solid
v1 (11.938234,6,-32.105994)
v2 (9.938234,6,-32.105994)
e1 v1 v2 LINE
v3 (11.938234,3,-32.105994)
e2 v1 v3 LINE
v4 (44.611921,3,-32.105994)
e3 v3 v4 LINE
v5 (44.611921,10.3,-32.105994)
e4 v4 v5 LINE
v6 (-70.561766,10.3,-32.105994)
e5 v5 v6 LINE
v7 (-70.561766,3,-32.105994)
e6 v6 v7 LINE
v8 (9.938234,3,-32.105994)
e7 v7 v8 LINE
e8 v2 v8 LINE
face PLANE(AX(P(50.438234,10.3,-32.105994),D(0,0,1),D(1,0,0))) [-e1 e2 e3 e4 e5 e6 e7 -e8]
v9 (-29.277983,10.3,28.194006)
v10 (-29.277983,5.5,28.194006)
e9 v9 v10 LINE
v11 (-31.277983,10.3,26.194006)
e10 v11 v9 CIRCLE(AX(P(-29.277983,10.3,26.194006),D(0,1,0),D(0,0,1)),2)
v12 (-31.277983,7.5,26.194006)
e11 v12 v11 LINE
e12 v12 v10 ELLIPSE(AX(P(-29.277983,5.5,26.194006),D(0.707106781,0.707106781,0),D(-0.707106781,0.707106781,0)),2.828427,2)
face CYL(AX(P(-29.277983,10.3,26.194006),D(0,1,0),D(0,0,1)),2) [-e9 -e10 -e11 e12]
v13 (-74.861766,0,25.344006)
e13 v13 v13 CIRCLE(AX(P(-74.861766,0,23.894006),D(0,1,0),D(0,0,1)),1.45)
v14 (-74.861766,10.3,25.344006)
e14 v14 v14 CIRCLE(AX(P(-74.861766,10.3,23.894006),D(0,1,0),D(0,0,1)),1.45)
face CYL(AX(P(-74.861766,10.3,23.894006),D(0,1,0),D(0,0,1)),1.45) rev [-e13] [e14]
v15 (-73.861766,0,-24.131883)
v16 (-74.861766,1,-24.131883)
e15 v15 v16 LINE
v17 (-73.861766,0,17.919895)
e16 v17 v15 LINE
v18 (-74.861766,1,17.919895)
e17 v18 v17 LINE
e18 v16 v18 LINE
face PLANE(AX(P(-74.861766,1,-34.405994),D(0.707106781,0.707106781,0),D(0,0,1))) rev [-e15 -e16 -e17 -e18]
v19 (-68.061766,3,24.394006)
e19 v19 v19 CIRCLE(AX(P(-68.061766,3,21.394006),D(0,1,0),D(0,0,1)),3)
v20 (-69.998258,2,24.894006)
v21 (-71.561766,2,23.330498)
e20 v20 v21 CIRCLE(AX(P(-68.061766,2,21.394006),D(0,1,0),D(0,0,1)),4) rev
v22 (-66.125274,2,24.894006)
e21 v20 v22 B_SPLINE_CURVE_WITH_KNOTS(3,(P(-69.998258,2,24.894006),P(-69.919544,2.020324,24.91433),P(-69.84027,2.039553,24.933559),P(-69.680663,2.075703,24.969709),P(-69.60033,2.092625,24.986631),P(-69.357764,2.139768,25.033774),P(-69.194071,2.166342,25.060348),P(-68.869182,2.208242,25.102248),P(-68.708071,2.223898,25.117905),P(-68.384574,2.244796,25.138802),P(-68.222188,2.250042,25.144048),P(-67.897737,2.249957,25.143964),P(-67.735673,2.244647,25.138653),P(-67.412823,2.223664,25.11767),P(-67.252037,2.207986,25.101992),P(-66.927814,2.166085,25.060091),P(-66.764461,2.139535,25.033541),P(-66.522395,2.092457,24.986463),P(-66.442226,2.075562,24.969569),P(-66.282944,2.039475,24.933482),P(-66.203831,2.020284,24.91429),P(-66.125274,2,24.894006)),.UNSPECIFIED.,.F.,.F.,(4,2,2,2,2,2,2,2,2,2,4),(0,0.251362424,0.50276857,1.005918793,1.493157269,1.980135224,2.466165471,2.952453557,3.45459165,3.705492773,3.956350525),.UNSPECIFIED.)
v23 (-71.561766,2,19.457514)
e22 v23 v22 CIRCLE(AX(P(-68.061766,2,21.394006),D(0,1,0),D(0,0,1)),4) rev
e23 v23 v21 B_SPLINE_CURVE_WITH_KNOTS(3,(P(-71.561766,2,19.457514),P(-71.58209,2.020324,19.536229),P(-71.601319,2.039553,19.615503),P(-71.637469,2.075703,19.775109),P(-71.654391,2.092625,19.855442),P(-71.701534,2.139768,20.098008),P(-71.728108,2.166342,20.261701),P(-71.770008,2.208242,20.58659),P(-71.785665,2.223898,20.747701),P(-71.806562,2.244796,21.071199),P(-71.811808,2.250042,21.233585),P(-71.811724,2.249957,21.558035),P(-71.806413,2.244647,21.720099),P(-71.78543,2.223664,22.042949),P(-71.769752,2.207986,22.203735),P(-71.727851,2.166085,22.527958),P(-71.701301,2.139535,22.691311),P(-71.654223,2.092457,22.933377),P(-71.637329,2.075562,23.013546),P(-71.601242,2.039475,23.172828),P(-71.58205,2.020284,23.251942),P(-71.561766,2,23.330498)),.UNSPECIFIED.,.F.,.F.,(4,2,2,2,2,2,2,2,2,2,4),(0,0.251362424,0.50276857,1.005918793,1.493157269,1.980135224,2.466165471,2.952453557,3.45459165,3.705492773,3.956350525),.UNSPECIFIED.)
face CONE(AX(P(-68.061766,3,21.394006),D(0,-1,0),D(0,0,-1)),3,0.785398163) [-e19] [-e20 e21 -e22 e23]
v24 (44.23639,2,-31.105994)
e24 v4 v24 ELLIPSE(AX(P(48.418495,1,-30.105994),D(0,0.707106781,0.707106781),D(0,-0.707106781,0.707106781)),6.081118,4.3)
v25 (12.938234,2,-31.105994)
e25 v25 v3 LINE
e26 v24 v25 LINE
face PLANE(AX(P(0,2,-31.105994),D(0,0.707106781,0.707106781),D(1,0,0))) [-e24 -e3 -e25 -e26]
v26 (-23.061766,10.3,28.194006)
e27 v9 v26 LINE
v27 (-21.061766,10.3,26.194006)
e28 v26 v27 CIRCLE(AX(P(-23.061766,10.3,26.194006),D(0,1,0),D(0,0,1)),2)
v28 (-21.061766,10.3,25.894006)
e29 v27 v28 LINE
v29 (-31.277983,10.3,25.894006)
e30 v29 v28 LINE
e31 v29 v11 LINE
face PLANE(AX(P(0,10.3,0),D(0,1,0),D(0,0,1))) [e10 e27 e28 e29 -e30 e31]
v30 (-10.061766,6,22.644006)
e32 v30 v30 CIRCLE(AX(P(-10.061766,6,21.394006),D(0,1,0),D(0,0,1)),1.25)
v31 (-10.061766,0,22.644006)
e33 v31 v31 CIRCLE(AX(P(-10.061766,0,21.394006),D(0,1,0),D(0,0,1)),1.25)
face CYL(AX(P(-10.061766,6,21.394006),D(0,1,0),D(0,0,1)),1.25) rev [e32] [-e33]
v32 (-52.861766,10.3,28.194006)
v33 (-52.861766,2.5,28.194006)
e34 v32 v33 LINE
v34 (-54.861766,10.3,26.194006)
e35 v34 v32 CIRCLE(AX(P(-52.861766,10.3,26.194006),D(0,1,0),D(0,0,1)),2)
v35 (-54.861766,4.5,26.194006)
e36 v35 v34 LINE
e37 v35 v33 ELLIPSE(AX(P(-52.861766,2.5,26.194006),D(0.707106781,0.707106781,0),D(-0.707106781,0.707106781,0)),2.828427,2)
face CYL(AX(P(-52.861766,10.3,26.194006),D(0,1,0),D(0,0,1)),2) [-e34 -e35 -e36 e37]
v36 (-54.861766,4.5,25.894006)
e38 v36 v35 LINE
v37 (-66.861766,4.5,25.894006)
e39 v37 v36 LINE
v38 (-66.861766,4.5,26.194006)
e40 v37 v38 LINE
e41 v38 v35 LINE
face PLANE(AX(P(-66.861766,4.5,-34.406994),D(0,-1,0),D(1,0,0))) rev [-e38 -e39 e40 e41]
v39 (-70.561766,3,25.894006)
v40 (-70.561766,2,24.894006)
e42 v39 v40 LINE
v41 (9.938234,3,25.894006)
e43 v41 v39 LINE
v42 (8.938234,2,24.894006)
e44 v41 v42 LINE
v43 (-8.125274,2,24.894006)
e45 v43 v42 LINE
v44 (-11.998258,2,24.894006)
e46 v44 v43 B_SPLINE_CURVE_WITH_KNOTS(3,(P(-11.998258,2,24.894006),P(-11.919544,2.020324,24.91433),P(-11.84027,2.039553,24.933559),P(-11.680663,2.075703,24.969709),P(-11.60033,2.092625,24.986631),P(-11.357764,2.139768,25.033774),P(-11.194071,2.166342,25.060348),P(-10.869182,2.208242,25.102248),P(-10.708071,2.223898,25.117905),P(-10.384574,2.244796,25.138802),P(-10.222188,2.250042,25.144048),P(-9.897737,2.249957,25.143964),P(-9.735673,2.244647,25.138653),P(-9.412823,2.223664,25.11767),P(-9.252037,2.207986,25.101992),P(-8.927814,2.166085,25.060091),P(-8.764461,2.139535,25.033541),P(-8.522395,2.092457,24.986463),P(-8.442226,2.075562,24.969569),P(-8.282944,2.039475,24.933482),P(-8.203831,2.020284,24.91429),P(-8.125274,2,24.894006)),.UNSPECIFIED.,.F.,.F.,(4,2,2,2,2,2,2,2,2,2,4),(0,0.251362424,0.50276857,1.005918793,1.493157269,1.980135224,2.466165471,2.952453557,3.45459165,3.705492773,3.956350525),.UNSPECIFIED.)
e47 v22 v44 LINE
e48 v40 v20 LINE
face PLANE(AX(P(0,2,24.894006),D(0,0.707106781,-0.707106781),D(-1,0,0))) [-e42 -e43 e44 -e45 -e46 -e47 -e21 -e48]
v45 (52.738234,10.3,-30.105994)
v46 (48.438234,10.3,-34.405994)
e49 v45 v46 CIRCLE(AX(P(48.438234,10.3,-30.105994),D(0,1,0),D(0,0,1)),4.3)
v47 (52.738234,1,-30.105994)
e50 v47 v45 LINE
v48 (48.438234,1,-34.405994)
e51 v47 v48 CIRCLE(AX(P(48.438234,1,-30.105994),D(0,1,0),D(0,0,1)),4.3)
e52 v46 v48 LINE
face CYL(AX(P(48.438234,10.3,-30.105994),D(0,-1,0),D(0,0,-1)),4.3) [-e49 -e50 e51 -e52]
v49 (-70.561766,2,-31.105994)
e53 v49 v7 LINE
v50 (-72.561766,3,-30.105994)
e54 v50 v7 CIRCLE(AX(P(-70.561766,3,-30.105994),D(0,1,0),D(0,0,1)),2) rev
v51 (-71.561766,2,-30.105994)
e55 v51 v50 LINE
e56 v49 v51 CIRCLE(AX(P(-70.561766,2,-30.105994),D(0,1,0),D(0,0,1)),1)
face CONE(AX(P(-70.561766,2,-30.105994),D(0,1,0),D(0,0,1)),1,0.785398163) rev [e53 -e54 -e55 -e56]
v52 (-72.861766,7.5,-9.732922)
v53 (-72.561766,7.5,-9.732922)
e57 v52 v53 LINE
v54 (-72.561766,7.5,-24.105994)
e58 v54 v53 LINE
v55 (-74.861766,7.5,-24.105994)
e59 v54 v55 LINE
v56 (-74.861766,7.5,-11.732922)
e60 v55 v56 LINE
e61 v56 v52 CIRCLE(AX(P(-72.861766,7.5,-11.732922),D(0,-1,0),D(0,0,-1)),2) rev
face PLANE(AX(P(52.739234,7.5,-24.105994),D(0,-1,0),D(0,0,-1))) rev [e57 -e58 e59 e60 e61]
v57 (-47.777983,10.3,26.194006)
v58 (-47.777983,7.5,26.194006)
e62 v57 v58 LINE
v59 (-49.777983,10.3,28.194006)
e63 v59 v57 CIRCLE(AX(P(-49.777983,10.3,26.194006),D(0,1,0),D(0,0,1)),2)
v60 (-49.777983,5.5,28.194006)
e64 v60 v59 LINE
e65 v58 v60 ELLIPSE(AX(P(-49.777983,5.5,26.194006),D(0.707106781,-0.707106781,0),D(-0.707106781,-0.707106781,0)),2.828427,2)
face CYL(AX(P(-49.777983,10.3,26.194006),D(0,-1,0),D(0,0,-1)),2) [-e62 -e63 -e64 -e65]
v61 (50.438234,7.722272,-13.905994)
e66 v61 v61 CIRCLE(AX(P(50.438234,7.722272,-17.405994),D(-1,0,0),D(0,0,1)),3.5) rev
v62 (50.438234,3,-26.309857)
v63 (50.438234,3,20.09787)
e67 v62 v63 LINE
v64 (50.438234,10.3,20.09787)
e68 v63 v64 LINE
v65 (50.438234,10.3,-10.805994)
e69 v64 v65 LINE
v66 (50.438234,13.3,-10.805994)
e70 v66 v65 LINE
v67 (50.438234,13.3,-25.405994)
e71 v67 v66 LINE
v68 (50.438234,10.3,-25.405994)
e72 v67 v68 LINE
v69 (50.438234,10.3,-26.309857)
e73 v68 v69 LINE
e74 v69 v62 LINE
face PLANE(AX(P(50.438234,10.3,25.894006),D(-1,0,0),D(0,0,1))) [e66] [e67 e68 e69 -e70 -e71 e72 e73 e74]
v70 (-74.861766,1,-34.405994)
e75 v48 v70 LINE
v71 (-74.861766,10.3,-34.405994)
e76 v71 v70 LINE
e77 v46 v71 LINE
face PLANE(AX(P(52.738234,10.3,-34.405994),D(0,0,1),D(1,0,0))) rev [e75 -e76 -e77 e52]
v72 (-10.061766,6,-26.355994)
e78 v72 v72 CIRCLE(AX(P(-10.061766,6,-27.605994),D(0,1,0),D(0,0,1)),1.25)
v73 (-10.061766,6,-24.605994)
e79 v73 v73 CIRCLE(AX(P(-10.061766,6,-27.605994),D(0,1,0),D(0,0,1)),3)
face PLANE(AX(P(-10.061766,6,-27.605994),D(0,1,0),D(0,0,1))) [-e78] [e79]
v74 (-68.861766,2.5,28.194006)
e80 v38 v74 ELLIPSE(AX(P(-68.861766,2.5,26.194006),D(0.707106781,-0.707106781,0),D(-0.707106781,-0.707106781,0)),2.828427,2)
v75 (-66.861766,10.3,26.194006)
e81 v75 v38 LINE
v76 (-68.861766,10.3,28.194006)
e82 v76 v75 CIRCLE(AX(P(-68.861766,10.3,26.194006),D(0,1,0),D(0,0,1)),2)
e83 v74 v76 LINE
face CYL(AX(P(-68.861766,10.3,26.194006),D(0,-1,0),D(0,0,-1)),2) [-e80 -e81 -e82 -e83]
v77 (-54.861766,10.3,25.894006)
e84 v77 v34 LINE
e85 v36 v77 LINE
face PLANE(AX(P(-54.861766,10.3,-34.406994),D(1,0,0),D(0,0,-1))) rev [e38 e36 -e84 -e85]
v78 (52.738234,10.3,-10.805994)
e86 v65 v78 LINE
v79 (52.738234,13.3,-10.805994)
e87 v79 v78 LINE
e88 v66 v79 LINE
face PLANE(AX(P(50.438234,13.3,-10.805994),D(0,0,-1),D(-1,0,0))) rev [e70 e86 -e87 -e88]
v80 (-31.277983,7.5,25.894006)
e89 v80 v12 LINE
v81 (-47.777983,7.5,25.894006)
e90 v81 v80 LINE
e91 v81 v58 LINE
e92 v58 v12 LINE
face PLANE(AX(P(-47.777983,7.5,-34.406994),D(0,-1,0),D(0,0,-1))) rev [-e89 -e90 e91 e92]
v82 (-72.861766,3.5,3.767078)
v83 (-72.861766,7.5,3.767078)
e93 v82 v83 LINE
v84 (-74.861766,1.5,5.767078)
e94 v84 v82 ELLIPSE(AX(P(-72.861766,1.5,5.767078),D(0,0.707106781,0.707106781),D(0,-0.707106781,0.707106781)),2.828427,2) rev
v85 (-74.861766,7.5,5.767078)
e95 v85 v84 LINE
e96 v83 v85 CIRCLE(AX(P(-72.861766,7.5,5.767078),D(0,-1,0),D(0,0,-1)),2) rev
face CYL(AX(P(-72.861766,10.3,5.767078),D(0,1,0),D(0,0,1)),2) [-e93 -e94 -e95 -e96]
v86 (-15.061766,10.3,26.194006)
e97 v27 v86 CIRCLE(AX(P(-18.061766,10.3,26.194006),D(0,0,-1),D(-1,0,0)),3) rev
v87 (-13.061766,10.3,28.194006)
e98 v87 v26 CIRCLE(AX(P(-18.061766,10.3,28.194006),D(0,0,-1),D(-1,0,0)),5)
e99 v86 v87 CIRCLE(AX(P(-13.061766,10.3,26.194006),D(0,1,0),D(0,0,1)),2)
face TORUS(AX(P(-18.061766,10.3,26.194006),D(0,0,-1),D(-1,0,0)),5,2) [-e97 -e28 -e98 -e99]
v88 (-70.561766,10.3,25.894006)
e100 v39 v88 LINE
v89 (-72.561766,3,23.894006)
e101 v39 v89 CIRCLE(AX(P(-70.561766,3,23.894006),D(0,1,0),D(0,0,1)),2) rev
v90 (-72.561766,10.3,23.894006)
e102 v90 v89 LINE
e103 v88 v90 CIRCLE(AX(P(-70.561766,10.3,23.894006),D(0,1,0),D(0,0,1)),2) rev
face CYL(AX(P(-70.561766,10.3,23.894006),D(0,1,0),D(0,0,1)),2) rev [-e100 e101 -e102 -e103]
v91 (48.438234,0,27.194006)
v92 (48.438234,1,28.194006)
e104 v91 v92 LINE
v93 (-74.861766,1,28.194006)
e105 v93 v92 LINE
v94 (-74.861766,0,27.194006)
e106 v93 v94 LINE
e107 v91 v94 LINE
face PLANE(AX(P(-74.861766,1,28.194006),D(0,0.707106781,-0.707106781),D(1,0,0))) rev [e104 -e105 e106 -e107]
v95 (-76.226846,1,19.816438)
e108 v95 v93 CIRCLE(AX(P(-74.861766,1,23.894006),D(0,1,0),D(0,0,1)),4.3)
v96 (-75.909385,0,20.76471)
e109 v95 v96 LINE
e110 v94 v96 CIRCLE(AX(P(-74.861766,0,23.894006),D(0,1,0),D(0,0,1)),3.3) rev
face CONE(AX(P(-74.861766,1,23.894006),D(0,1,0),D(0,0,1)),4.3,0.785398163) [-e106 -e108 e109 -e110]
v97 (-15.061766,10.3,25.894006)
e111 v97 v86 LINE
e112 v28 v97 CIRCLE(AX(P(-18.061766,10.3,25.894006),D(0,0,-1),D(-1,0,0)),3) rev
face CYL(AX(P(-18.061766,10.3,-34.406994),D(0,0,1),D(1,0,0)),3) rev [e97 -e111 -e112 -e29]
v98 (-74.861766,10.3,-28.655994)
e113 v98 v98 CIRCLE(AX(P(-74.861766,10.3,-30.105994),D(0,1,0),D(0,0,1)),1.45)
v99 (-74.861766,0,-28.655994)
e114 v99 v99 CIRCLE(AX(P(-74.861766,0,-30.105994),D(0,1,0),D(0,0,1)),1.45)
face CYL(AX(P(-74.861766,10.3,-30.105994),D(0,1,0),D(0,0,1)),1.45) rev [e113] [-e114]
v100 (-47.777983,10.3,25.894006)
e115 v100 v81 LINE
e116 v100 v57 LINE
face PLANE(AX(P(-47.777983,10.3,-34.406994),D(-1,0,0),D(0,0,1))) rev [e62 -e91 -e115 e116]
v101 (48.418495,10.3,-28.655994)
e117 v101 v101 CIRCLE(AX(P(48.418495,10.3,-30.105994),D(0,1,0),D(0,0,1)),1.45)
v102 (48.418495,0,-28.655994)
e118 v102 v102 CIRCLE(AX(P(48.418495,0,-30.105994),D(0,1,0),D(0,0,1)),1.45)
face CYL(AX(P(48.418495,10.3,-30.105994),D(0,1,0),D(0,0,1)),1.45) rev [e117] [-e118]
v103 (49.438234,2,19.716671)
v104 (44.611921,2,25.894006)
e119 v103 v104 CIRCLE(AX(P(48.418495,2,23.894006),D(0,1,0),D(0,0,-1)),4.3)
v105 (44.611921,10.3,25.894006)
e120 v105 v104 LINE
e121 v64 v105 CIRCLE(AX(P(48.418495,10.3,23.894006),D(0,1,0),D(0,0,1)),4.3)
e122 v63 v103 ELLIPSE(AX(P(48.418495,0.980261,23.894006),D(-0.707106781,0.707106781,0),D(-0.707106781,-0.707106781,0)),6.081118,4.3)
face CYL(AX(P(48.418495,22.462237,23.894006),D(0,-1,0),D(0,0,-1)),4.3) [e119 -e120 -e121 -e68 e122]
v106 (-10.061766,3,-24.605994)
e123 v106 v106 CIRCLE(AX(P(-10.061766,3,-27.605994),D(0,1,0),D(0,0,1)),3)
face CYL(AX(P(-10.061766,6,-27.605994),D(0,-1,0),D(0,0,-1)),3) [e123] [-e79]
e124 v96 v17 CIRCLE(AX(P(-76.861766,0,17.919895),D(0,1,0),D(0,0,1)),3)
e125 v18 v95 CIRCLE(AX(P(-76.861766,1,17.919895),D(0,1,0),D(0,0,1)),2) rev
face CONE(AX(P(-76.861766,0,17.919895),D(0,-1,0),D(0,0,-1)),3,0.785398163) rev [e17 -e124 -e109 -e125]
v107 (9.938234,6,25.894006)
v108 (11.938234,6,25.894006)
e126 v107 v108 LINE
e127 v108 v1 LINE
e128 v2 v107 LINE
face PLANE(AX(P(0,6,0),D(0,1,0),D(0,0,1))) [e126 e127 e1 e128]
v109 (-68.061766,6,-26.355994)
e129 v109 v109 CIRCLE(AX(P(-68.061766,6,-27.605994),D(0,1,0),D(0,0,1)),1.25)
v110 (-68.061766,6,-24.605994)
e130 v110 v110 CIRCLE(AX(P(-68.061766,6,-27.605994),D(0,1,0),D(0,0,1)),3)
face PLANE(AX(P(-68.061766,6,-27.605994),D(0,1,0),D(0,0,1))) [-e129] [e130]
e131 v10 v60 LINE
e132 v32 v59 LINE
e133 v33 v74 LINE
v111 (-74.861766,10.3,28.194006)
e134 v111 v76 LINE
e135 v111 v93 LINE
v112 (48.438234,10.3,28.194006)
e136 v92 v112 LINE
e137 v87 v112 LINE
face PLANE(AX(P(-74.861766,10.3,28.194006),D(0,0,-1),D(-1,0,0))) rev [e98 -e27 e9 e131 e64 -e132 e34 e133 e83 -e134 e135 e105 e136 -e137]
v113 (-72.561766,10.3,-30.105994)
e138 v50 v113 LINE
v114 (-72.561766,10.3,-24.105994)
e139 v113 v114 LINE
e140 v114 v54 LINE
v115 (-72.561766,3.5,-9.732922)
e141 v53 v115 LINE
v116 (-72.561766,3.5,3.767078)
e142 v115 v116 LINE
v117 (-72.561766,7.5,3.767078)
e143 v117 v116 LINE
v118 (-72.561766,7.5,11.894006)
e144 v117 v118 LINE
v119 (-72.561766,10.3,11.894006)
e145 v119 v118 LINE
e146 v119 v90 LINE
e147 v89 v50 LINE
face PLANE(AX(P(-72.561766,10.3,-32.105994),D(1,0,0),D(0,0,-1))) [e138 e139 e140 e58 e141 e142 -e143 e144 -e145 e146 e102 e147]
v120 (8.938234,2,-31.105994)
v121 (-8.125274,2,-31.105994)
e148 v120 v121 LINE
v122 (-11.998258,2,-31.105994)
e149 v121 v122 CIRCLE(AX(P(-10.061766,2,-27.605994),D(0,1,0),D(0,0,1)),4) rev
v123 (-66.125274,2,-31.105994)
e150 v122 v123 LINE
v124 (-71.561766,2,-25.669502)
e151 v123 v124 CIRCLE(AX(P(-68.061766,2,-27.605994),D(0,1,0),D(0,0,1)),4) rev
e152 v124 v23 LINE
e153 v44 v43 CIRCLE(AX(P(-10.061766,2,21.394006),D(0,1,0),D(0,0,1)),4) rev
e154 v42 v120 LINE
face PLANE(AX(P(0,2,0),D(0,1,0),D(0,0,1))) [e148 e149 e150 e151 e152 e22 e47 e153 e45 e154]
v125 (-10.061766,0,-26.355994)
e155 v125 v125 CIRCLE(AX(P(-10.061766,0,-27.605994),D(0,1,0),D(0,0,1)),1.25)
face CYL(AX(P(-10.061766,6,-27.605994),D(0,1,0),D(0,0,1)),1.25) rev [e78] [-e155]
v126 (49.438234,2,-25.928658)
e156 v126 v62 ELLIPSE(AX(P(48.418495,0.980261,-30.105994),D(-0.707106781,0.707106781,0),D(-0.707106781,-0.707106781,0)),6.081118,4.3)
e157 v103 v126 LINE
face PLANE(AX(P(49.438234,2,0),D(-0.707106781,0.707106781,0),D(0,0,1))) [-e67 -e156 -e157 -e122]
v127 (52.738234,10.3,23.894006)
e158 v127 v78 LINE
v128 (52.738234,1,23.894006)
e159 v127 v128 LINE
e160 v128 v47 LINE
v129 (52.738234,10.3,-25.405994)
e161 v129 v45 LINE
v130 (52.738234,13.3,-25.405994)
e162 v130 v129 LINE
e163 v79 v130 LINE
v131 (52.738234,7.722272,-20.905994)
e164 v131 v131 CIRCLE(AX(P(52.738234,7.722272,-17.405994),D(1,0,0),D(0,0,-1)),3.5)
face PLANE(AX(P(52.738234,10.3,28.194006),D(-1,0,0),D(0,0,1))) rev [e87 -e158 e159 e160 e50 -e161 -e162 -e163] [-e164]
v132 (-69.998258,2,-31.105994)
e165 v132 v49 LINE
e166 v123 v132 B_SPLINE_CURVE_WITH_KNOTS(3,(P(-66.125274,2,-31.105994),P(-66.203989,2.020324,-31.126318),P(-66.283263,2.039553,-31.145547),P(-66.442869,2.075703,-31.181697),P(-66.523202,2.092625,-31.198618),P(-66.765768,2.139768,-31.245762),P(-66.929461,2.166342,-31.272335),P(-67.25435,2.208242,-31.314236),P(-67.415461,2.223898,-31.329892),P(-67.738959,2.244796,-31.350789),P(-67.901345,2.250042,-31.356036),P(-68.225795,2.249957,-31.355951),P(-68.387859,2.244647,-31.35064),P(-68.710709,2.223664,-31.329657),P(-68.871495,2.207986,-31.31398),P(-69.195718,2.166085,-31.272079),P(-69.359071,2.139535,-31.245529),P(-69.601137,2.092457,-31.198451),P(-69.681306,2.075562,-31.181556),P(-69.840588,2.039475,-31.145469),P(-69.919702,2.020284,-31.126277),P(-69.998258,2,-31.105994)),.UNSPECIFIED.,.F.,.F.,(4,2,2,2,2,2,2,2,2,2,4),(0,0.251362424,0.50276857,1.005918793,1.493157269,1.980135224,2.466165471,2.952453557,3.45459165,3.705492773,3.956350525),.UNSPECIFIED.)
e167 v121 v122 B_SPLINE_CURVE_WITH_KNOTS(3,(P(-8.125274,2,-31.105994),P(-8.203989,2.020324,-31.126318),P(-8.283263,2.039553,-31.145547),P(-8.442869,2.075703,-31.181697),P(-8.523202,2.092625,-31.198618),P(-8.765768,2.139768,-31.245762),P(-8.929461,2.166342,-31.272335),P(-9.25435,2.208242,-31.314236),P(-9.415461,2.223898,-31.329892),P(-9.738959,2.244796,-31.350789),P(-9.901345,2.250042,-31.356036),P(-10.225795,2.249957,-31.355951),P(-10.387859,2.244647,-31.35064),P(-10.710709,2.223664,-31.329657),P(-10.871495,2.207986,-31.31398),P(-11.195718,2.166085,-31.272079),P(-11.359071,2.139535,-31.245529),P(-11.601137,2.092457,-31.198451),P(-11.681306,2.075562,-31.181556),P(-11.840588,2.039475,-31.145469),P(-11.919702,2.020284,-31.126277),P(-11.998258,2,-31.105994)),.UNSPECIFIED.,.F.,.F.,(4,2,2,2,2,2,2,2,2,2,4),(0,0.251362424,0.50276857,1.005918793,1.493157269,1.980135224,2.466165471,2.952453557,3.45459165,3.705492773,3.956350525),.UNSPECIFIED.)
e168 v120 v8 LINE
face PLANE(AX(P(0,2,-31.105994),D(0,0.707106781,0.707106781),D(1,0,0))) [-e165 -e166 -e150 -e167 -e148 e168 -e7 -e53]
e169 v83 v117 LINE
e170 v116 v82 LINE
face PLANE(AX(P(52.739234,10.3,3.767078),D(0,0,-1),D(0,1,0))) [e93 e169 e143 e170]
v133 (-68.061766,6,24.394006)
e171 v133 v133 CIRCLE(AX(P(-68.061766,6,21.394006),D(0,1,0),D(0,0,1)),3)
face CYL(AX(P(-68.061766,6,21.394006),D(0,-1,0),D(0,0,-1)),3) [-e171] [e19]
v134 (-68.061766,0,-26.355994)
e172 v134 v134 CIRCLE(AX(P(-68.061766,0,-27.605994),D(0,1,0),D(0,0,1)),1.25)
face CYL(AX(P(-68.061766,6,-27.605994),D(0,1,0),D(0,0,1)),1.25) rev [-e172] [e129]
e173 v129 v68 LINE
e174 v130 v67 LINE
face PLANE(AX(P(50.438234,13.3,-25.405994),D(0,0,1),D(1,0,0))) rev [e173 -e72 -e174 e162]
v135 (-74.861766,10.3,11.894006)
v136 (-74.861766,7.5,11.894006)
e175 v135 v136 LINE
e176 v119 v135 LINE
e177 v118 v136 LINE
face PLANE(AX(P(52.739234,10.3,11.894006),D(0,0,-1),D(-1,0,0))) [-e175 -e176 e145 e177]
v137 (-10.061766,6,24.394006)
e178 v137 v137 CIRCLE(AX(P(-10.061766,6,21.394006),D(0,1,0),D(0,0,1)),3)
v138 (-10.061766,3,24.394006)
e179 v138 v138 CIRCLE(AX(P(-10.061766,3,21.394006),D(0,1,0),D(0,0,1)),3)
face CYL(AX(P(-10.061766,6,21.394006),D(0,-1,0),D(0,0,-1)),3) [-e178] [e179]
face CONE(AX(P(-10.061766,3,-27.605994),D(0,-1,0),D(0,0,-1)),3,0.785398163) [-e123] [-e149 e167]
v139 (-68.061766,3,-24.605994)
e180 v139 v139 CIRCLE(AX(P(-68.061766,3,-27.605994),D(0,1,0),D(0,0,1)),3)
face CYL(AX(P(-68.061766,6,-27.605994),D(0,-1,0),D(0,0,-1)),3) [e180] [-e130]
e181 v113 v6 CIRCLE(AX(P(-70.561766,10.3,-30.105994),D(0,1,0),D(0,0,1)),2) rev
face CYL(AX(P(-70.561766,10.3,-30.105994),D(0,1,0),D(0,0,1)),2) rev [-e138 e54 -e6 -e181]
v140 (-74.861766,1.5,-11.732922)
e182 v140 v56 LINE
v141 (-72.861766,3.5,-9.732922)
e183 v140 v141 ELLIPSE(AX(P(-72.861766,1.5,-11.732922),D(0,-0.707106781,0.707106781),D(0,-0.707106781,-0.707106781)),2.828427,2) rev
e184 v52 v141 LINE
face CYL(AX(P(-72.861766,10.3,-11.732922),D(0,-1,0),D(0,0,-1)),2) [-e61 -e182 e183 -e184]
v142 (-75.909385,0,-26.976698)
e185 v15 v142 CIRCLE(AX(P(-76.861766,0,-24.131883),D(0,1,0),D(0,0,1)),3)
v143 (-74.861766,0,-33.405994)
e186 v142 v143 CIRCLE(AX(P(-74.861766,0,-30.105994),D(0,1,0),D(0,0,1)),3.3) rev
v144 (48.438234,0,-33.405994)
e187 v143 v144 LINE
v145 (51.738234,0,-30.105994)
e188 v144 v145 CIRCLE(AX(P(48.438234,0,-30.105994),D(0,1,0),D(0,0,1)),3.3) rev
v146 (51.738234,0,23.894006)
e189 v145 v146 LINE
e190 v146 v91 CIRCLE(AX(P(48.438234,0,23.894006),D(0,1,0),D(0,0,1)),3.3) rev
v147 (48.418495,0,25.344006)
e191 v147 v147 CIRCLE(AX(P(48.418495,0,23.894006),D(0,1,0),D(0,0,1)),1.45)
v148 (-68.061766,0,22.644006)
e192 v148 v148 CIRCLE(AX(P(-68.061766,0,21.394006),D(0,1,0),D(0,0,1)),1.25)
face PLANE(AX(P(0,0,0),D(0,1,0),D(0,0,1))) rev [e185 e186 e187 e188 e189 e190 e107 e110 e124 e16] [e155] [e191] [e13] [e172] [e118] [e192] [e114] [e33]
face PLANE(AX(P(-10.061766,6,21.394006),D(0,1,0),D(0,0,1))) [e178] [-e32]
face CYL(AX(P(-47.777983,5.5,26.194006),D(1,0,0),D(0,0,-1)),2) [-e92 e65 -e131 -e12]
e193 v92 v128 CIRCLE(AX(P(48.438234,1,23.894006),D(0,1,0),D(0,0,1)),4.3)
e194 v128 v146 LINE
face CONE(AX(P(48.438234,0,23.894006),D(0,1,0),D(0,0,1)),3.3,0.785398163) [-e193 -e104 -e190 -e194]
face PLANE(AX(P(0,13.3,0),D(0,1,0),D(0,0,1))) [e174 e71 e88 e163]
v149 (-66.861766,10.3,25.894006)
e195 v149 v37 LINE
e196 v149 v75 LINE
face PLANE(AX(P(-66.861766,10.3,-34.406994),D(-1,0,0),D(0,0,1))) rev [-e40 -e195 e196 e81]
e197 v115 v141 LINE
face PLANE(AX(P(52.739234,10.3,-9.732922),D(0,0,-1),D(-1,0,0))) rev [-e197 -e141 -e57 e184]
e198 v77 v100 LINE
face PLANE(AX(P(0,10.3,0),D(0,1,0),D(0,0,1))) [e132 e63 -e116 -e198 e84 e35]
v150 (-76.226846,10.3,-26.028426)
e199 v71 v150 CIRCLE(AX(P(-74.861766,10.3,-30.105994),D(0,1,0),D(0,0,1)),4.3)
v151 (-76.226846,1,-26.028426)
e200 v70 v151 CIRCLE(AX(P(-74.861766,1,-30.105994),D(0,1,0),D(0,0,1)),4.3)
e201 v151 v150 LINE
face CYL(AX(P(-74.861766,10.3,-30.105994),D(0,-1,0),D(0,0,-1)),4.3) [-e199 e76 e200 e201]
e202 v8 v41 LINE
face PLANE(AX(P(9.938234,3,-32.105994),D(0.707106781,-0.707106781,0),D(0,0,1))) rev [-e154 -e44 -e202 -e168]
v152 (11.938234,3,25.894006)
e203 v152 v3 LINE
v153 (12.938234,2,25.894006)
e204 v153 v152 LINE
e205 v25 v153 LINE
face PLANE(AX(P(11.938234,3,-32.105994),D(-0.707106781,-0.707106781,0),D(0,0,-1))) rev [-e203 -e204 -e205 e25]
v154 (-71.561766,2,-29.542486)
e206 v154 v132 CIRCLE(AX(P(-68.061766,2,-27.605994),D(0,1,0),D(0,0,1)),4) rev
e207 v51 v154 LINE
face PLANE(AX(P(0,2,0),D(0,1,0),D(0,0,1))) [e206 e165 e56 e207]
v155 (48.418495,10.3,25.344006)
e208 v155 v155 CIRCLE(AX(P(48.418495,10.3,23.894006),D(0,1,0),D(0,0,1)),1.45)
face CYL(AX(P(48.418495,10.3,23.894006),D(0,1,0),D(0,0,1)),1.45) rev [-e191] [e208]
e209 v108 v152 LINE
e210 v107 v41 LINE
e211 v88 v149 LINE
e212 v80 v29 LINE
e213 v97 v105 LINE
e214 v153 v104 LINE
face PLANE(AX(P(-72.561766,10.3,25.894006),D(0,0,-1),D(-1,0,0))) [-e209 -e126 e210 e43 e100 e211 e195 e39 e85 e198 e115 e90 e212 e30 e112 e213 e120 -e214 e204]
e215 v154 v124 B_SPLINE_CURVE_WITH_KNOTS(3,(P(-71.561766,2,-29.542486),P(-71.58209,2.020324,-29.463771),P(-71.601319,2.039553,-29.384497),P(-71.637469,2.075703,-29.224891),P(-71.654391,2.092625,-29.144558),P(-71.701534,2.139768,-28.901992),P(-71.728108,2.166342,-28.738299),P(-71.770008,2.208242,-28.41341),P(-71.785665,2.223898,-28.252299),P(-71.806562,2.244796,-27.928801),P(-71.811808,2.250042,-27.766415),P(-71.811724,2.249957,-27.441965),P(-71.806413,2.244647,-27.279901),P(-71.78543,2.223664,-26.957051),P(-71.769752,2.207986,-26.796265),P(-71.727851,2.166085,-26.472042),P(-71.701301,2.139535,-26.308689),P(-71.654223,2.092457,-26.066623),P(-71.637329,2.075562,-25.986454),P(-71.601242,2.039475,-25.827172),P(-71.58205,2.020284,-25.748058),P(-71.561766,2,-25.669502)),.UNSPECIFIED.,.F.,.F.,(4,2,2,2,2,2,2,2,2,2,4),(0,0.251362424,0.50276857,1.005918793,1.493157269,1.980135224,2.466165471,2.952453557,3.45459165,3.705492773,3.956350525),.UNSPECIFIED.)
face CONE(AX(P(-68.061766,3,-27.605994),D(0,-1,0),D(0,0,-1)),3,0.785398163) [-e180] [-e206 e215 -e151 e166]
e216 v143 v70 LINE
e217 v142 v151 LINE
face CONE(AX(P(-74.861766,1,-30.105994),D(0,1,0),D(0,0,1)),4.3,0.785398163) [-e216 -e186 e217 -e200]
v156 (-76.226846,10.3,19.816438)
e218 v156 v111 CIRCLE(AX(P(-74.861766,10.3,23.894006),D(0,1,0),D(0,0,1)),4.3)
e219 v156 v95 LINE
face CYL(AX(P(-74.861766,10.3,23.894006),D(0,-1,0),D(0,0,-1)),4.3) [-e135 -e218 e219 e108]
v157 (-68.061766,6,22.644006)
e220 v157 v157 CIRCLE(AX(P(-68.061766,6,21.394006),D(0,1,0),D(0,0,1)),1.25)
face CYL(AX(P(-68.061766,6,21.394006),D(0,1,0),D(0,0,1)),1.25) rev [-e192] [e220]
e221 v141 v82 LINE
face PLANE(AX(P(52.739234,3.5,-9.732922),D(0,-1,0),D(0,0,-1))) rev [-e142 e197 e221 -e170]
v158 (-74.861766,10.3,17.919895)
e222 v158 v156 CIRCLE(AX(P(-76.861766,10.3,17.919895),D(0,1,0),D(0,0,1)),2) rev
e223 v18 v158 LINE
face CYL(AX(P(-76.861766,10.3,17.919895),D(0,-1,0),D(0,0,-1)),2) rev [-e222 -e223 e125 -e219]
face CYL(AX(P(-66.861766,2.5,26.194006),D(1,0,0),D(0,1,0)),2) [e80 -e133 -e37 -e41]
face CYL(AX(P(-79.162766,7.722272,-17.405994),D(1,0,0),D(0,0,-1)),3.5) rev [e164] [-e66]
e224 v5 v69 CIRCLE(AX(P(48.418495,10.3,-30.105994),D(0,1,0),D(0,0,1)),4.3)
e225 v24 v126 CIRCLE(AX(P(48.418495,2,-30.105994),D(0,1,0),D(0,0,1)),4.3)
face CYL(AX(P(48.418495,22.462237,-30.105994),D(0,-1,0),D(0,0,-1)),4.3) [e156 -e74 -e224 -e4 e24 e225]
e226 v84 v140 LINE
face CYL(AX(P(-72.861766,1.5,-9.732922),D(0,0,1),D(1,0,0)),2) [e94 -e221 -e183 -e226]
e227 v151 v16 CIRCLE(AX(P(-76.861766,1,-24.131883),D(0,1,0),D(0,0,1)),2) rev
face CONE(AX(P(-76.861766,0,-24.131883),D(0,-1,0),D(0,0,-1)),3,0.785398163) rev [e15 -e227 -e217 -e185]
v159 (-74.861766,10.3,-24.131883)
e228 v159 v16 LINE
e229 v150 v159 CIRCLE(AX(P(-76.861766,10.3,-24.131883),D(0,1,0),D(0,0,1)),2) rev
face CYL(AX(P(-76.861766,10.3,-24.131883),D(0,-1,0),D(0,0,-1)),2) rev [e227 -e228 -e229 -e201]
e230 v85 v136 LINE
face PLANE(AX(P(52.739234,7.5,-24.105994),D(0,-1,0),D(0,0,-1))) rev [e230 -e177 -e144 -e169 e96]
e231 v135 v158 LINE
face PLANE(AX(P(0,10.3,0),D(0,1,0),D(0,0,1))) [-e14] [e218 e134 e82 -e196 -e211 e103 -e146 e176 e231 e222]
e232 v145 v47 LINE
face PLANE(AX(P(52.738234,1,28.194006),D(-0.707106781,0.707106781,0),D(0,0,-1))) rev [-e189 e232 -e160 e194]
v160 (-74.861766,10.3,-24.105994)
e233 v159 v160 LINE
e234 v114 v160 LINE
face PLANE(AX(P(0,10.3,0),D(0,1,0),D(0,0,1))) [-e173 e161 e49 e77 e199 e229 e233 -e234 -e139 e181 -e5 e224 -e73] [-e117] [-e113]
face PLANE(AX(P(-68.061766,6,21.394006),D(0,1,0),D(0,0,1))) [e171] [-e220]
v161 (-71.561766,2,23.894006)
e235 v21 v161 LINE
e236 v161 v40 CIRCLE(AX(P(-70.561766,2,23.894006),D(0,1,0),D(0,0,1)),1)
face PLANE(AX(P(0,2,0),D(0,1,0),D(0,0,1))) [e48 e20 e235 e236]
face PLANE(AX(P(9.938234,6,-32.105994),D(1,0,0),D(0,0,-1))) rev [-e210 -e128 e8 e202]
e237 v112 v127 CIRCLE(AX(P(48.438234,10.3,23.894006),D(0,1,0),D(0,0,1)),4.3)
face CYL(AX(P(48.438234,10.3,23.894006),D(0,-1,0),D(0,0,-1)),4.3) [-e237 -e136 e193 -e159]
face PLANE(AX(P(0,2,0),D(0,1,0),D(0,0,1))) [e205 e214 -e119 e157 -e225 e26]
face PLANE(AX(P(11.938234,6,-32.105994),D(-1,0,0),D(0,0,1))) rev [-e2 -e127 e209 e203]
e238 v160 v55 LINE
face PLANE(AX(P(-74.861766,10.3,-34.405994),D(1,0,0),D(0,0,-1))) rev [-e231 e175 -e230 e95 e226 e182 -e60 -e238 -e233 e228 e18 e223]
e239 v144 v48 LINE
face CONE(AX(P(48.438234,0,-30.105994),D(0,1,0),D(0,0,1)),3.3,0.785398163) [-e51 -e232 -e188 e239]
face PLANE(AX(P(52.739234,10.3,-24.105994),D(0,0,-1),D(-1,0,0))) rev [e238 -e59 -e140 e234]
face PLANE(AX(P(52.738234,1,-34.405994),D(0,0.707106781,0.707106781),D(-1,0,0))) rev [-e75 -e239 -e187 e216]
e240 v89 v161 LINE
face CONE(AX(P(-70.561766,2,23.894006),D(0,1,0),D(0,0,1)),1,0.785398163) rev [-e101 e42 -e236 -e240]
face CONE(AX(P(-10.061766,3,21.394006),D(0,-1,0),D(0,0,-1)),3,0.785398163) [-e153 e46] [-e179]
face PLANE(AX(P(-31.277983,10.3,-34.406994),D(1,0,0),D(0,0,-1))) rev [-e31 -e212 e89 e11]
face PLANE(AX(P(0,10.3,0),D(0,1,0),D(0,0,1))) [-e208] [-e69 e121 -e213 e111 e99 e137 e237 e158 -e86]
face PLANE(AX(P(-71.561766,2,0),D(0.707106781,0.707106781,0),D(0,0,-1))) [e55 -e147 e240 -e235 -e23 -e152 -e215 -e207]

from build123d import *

# Parameters (mm, degrees)
SKETCH3_W                      = 127.6
SKETCH3_H                      = 62.6
SKETCH3_W_2                    = 123
SKETCH3_H_2                    = 58
BOSS_EXTRUDE1_DEPTH            = 10.3
SKETCH5_W                      = 123
SKETCH5_H                      = 58
BOSS_EXTRUDE2_DEPTH            = 2
SKETCH6_R                      = 3
BOSS_EXTRUDE3_DEPTH            = 4
F_2_5_2_5_DIAMETER_HOLE1_D     = 2.5
F_2_5_2_5_DIAMETER_HOLE1_DEPTH = 8
F_2_5_2_5_DIAMETER_HOLE1_TIP   = 0.751075774
SKETCH10_W                     = 2
SKETCH10_H                     = 58
BOSS_EXTRUDE4_DEPTH            = 4
CUT_EXTRUDE1_REACH             = 100.128
SKETCH11_R                     = 3
SKETCH11_W                     = 12
SKETCH11_H                     = 5.8
SKETCH11_W_2                   = 16.5
SKETCH11_H_2                   = 2.8
CUT_EXTRUDE2_REACH             = 134.558
SKETCH12_W                     = 13.5
SKETCH12_H                     = 6.8
SKETCH12_W_2                   = 36
SKETCH12_H_2                   = 2.8
FILLET6_R                      = 2
FILLET8_R                      = 2
CHAMFER1_SIZE                  = 1
FILLET9_R                      = 2
BOSS_EXTRUDE6_DEPTH            = 10.3
F_2_9_2_9_DIAMETER_HOLE2_D     = 2.9
F_2_9_2_9_DIAMETER_HOLE1_D     = 2.9
SKETCH24_R                     = 4.3
BOSS_EXTRUDE7_DEPTH            = 8.3
F_2_9_2_9_DIAMETER_HOLE5_D     = 2.9
F_2_9_2_9_DIAMETER_HOLE4_D     = 2.9
FILLET10_R                     = 4.3
FILLET18_R                     = 2
CHAMFER3_SIZE                  = 1
FILLET19_R                     = 2
FILLET20_R                     = 4.3
CHAMFER6_SIZE                  = 1
SKETCH29_W                     = 2.3
SKETCH29_H                     = 14.6
BOSS_EXTRUDE8_DEPTH            = 3
CUT_EXTRUDE3_REACH             = 161.862
SKETCH13_R                     = 3.5
CHAMFER7_SIZE                  = 1


# Some blends are built 0.0001 mm under size
with BuildPart() as part:
    # Sketch3 → Boss-Extrude1 (new body)
    with BuildSketch(Plane(origin=(0, 0, 0), x_dir=(1, 0, 0), z_dir=(0, 1, 0))):
        with Locations((-11.061766162, 3.105993834)):
            Rectangle(SKETCH3_W, SKETCH3_H)
        with Locations((-11.061766162, 3.105993834)):
            Rectangle(SKETCH3_W_2, SKETCH3_H_2, mode=Mode.SUBTRACT)
    extrude(amount=BOSS_EXTRUDE1_DEPTH)

    # Sketch5 → Boss-Extrude2 (add)
    with BuildSketch(Plane(origin=(0, 0, 0), x_dir=(1, 0, 0), z_dir=(0, 1, 0))):
        with Locations((-11.061766162, 3.105993834)):
            Rectangle(SKETCH5_W, SKETCH5_H)
    extrude(amount=BOSS_EXTRUDE2_DEPTH)

    # Sketch6 → Boss-Extrude3 (add)
    with BuildSketch(Plane(origin=(0, 2, 0), x_dir=(1, 0, 0), z_dir=(0, 1, 0))):
        with Locations(Location((-68.061766162, 27.605993834, 0), (0, 0, 270))):
            Circle(SKETCH6_R)
        with Locations(Location((-68.061766162, -21.394006166, 0), (0, 0, 270))):
            Circle(SKETCH6_R)
        with Locations(Location((-10.061766162, -21.394006166, 0), (0, 0, 270))):
            Circle(SKETCH6_R)
        with Locations(Location((-10.061766162, 27.605993834, 0), (0, 0, 270))):
            Circle(SKETCH6_R)
    extrude(amount=BOSS_EXTRUDE3_DEPTH)

    # Ø2.5 (2.5) Diameter Hole1
    with Locations(Plane(origin=(0, 6, 0), x_dir=(1, 0, 0), z_dir=(0, 1, 0))):
        with Locations((-68.061766162, 27.605993834), (-10.061766162, 27.605993834), (-10.061766162, -21.394006166), (-68.061766162, -21.394006166)):
            Hole(F_2_5_2_5_DIAMETER_HOLE1_D / 2, depth=F_2_5_2_5_DIAMETER_HOLE1_DEPTH)
            with Locations((0, 0, -(F_2_5_2_5_DIAMETER_HOLE1_DEPTH + F_2_5_2_5_DIAMETER_HOLE1_TIP / 2))):  # 118° drill point
                Cone(0, F_2_5_2_5_DIAMETER_HOLE1_D / 2, F_2_5_2_5_DIAMETER_HOLE1_TIP, mode=Mode.SUBTRACT)

    # Sketch10 → Boss-Extrude4 (add)
    with BuildSketch(Plane(origin=(0, 2, 0), x_dir=(1, 0, 0), z_dir=(0, 1, 0))):
        with Locations((10.938233838, 3.105993834)):
            Rectangle(SKETCH10_W, SKETCH10_H)
    extrude(amount=BOSS_EXTRUDE4_DEPTH)

    # Sketch11 → Cut-Extrude1 (cut, up to next)
    with BuildSketch(Plane.XY.offset(28.194006166), mode=Mode.PRIVATE) as cut_extrude1_sk1:
        with Locations((-18.061766162, 10.3)):
            Circle(SKETCH11_R)
    cut_extrude1_tool1 = extrude(cut_extrude1_sk1.sketch, amount=-CUT_EXTRUDE1_REACH, mode=Mode.PRIVATE) & part.part
    # Sketch11 → Cut-Extrude1 (cut, up to next)
    with BuildSketch(Plane.XY.offset(28.194006166), mode=Mode.PRIVATE) as cut_extrude1_sk2:
        with Locations((-60.861766162, 7.4)):
            Rectangle(SKETCH11_W, SKETCH11_H)
    cut_extrude1_tool2 = extrude(cut_extrude1_sk2.sketch, amount=-CUT_EXTRUDE1_REACH, mode=Mode.PRIVATE) & part.part
    # Sketch11 → Cut-Extrude1 (cut, up to next)
    with BuildSketch(Plane.XY.offset(28.194006166), mode=Mode.PRIVATE) as cut_extrude1_sk3:
        with Locations((-39.527982648, 8.9)):
            Rectangle(SKETCH11_W_2, SKETCH11_H_2)
    cut_extrude1_tool3 = extrude(cut_extrude1_sk3.sketch, amount=-CUT_EXTRUDE1_REACH, mode=Mode.PRIVATE) & part.part
    add(cut_extrude1_tool1.solids().sort_by_distance((-18.061766, 10.3, 28.194006))[0], mode=Mode.SUBTRACT)
    add(cut_extrude1_tool2.solids().sort_by_distance((-60.861766, 7.4, 28.194006))[0], mode=Mode.SUBTRACT)
    add(cut_extrude1_tool3.solids().sort_by_distance((-39.527983, 8.9, 28.194006))[0], mode=Mode.SUBTRACT)

    # Sketch12 → Cut-Extrude2 (cut, up to next)
    with BuildSketch(Plane.ZY.offset(74.861766162), mode=Mode.PRIVATE) as cut_extrude2_sk1:
        with Locations((-2.982922372, 6.9)):
            Rectangle(SKETCH12_W, SKETCH12_H)
    cut_extrude2_tool1 = extrude(cut_extrude2_sk1.sketch, amount=-CUT_EXTRUDE2_REACH, mode=Mode.PRIVATE) & part.part
    # Sketch12 → Cut-Extrude2 (cut, up to next)
    with BuildSketch(Plane.ZY.offset(74.861766162), mode=Mode.PRIVATE) as cut_extrude2_sk2:
        with Locations((-6.105993834, 8.9)):
            Rectangle(SKETCH12_W_2, SKETCH12_H_2)
    cut_extrude2_tool2 = extrude(cut_extrude2_sk2.sketch, amount=-CUT_EXTRUDE2_REACH, mode=Mode.PRIVATE) & part.part
    add(cut_extrude2_tool1.solids().sort_by_distance((-74.861766, 6.9, -2.982922))[0], mode=Mode.SUBTRACT)
    add(cut_extrude2_tool2.solids().sort_by_distance((-74.861766, 8.9, -6.105994))[0], mode=Mode.SUBTRACT)

    # Fillet6
    fillet6_edges = [part.edges().sort_by_distance(p)[0] for p in [
        (50.438233838, 6.15, -32.105993834),
    ]]
    fillet(fillet6_edges, radius=FILLET6_R)

    # Fillet8
    fillet8_edges = [part.edges().sort_by_distance(p)[0] for p in [
        (-72.561766162, 6.15, -32.105993834),
        (-72.561766162, 6.15, 25.894006166),
    ]]
    fillet(fillet8_edges, radius=FILLET8_R)

    # Chamfer1
    chamfer1_edges = [part.edges().sort_by_distance(p)[0] for p in [
        (-68.061766162, 2, -30.605993834),
        (-68.061766162, 2, 18.394006166),
        (-10.061766162, 2, 18.394006166),
        (-10.061766162, 2, -30.605993834),
    ]]
    chamfer(chamfer1_edges, length=CHAMFER1_SIZE)

    # Fillet9
    fillet9_edges = [part.edges().sort_by_distance(p)[0] for p in [
        (-60.861766162, 4.5, 28.194006166),
        (-54.861766162, 7.4, 28.194006166),
        (-47.777982648, 8.9, 28.194006166),
        (-39.527982648, 7.5, 28.194006166),
        (-31.277982648, 8.9, 28.194006166),
        (-18.061766162, 7.3, 28.194006166),
        (-74.861766162, 5.5, -9.732922372),
        (-74.861766162, 3.5, -2.982922372),
        (-74.861766162, 5.5, 3.767077628),
    ]]
    fillet(fillet9_edges, radius=FILLET9_R)

    # Sketch17 → Boss-Extrude6 (add)
    with BuildSketch(Plane(origin=(0, 0, 0), x_dir=(1, 0, 0), z_dir=(0, 1, 0))):
        with BuildLine():
            Line((-74.861766162, 34.405993834), (-74.861766162, 25.805993834))
            ThreePointArc((-74.861766162, 25.805993834), (-79.161766162, 30.105993834), (-74.861766162, 34.405993834))
        make_face()
        with BuildLine():
            Line((-74.861766162, -19.594006166), (-74.861766162, -28.194006166))
            ThreePointArc((-74.861766162, -28.194006166), (-79.161766162, -23.894006166), (-74.861766162, -19.594006166))
        make_face()
    extrude(amount=BOSS_EXTRUDE6_DEPTH)

    # Ø2.9 (2.9) Diameter Hole2 (through all)
    with Locations(Plane(origin=(0, 10.3, 0), x_dir=(1, 0, 0), z_dir=(0, 1, 0))):
        with Locations((-74.861766162, 30.105993834)):
            Hole(F_2_9_2_9_DIAMETER_HOLE2_D / 2)

    # Ø2.9 (2.9) Diameter Hole1 (through all)
    with Locations(Plane(origin=(0, 10.3, 0), x_dir=(1, 0, 0), z_dir=(0, 1, 0))):
        with Locations((-74.861766162, -23.894006166)):
            Hole(F_2_9_2_9_DIAMETER_HOLE1_D / 2)

    # Sketch24 → Boss-Extrude7 (add)
    with BuildSketch(Plane(origin=(0, 2, 0), x_dir=(1, 0, 0), z_dir=(0, 1, 0))):
        with Locations((48.418494527, -23.894006166)):
            Circle(SKETCH24_R)
        with Locations((48.418494527, 30.105993834)):
            Circle(SKETCH24_R)
    extrude(amount=BOSS_EXTRUDE7_DEPTH)

    # Ø2.9 (2.9) Diameter Hole5 (through all)
    with Locations(Plane(origin=(0, 10.3, 0), x_dir=(1, 0, 0), z_dir=(0, 1, 0))):
        with Locations((48.418494527, -23.894006166)):
            Hole(F_2_9_2_9_DIAMETER_HOLE5_D / 2)

    # Ø2.9 (2.9) Diameter Hole4 (through all)
    with Locations(Plane(origin=(0, 10.3, 0), x_dir=(1, 0, 0), z_dir=(0, 1, 0))):
        with Locations((48.418494527, 30.105993834)):
            Hole(F_2_9_2_9_DIAMETER_HOLE4_D / 2)

    # Fillet10
    fillet10_edges = [part.edges().sort_by_distance(p)[0] for p in [
        (52.738233838, 5.15, -34.405993834),
    ]]
    fillet(fillet10_edges, radius=FILLET10_R)

    # Fillet18
    fillet18_edges = [part.edges().sort_by_distance(p)[0] for p in [
        (-74.861766162, 5.15, -25.805993834),
        (-74.861766162, 5.15, 19.594006166),
    ]]
    fillet(fillet18_edges, radius=FILLET18_R)

    # Chamfer3
    chamfer3_edges = [part.edges().sort_by_distance(p)[0] for p in [
        (-79.105793795, 0, -30.797535193),
        (-13.211766162, 0, -34.405993834),
        (51.478792997, 0, -33.146552993),
        (-79.105793795, 0, 24.585547524),
        (-74.861766162, 0, -3.105993834),
        (-75.2385223, 0, 19.088261462),
        (-75.2385223, 0, -25.300249131),
        (52.738233838, 0, -0.955993834),
        (-11.061766162, 0, 28.194006166),
    ]]
    chamfer(chamfer3_edges, length=CHAMFER3_SIZE)

    # Fillet19
    fillet19_edges = [part.edges().sort_by_distance(p)[0] for p in [
        (-66.861766162, 6.4, 28.194006166),
    ]]
    fillet(fillet19_edges, radius=FILLET19_R)

    # Fillet20
    # the kernel refuses this fillet: 4.3 mm, written as the material it takes off along each edge
    with BuildSketch(Plane(origin=(52.738233838, -9.75, 28.194006166), x_dir=(-1, 0, 0), z_dir=(0, 1, 0))) as fillet20_piece_1:
        with BuildLine():
            CenterArc((FILLET20_R, -FILLET20_R), FILLET20_R, 90, 90)
            Line((0, -FILLET20_R), (0, 0))
            Line((0, 0), (FILLET20_R, 0))
        make_face()
    extrude(amount=30.8, mode=Mode.SUBTRACT)

    # Chamfer5
    # the kernel refuses this chamfer: 1 mm, written as the material it adds along each edge
    with BuildSketch(Plane(origin=(-72.561766162, 2, 23.894006166), x_dir=(-0.027495876610568366, 0.9996219169112972, 0), z_dir=(0, 0, -1))) as chamfer5_piece_1:
        with BuildLine():
            Line((1.028673195, 0), (-0.056547155, 1.027117794))
            Line((-0.056547155, 1.027117794), (-0.076539593, 1.026567876))
            ThreePointArc((-0.076539593, 1.026567876), (-0.034129227, 0.51339783), (-0.019992438, -0.000549918))
            Line((-0.019992438, -0.000549918), (0.000549918, -0.019992438))
            ThreePointArc((0.000549918, -0.019992438), (0.514497665, -0.00585565), (1.029223113, -0.019992438))
            Line((1.029223113, -0.019992438), (1.028673195, 0))
        make_face()
    extrude(amount=54)
    with BuildSketch(Plane(origin=(-70.561766162, 2, 23.894006166), x_dir=(0, 0, 1), z_dir=(1, 0, 0))) as chamfer5_piece_2:
        with BuildLine():
            Line((2.028284271, -1.028284271), (0.971715729, 0.028284271))
            Line((0.971715729, 0.028284271), (0.971715729, 0.048284271))
            ThreePointArc((0.971715729, 0.048284271), (1.485857864, 0.02), (2, 0.02))
            Line((2, 0.02), (2.02, 0))
            ThreePointArc((2.02, 0), (2.02, -0.514142136), (2.048284271, -1.028284271))
            Line((2.048284271, -1.028284271), (2.028284271, -1.028284271))
        make_face()
    revolve(axis=Axis((-70.561766162, 2, 23.894006166), (0, -1, 0)), revolution_arc=90)
    with BuildSketch(Plane(origin=(-70.561766162, 2, -30.105993834), x_dir=(0, 0, -1), z_dir=(1, 0, 0))) as chamfer5_piece_3:
        with BuildLine():
            Line((2.028284271, 1.028284271), (0.971715729, -0.028284271))
            Line((0.971715729, -0.028284271), (0.971715729, -0.048284271))
            ThreePointArc((0.971715729, -0.048284271), (1.485857864, -0.02), (2, -0.02))
            Line((2, -0.02), (2.02, 0))
            ThreePointArc((2.02, 0), (2.02, 0.514142136), (2.048284271, 1.028284271))
            Line((2.048284271, 1.028284271), (2.028284271, 1.028284271))
        make_face()
    revolve(axis=Axis((-70.561766162, 2, -30.105993834), (0, 1, 0)), revolution_arc=90)
    with BuildSketch(Plane(origin=(9.938233838, 2, 25.894006166), x_dir=(0, 0.999621916911297, 0.027495876610582174), z_dir=(-1, 0, 0)), Plane(origin=(-70.561766162, 2, -32.105993834), x_dir=(0, 0.9996219169112968, -0.027495876610589075), z_dir=(1, 0, 0))) as chamfer5_piece_4:
        with BuildLine():
            Line((1.028673195, 0), (-0.056547155, 1.027117794))
            Line((-0.056547155, 1.027117794), (-0.076539593, 1.026567876))
            ThreePointArc((-0.076539593, 1.026567876), (-0.034129227, 0.51339783), (-0.019992438, -0.000549918))
            Line((-0.019992438, -0.000549918), (0.000549918, -0.019992438))
            ThreePointArc((0.000549918, -0.019992438), (0.514497665, -0.00585565), (1.029223113, -0.019992438))
            Line((1.029223113, -0.019992438), (1.028673195, 0))
        make_face()
    extrude(amount=80.5)
    with BuildSketch(Plane(origin=(9.938233838, 2, 25.894006166), x_dir=(-0.9996219169112968, -0.027495876610586247, 0), z_dir=(0, 0, -1))) as chamfer5_piece_5:
        with BuildLine():
            Line((1.028673195, 0), (-0.056547155, 1.027117794))
            Line((-0.056547155, 1.027117794), (-0.076539593, 1.026567876))
            ThreePointArc((-0.076539593, 1.026567876), (-0.034129227, 0.51339783), (-0.019992438, -0.000549918))
            Line((-0.019992438, -0.000549918), (0.000549918, -0.019992438))
            ThreePointArc((0.000549918, -0.019992438), (0.514497665, -0.00585565), (1.029223113, -0.019992438))
            Line((1.029223113, -0.019992438), (1.028673195, 0))
        make_face()
    extrude(amount=58)
    with BuildSketch(Plane(origin=(11.938233838, 2, -32.105993834), x_dir=(-0.027495876610585623, 0.9996219169112968, 0), z_dir=(0, 0, 1))) as chamfer5_piece_6:
        with BuildLine():
            Line((1.028673195, 0), (-0.056547155, -1.027117794))
            Line((-0.056547155, -1.027117794), (-0.076539593, -1.026567876))
            ThreePointArc((-0.076539593, -1.026567876), (-0.034129227, -0.51339783), (-0.019992438, 0.000549918))
            Line((-0.019992438, 0.000549918), (0.000549918, 0.019992438))
            ThreePointArc((0.000549918, 0.019992438), (0.514497665, 0.00585565), (1.029223113, 0.019992438))
            Line((1.029223113, 0.019992438), (1.028673195, 0))
        make_face()
    extrude(amount=58)
    with BuildSketch(Plane(origin=(11.938233838, 2, -32.105993834), x_dir=(0, 0.999621916911297, -0.027495876610582174), z_dir=(1, 0, 0))) as chamfer5_piece_7_section:
        with BuildLine():
            Line((1.028673195, 0), (-0.056547155, 1.027117794))
            Line((-0.056547155, 1.027117794), (-0.076539593, 1.026567876))
            ThreePointArc((-0.076539593, 1.026567876), (-0.034129227, 0.51339783), (-0.019992438, -0.000549918))
            Line((-0.019992438, -0.000549918), (0.000549918, -0.019992438))
            ThreePointArc((0.000549918, -0.019992438), (0.514497665, -0.00585565), (1.029223113, -0.019992438))
            Line((1.029223113, -0.019992438), (1.028673195, 0))
        make_face()
    chamfer5_piece_7 = extrude(amount=35.245370415, mode=Mode.PRIVATE)
    chamfer5_piece_7 = chamfer5_piece_7 - Plane(origin=(48.418494527, 2.330215388, -30.105993834), x_dir=(1, 0, 0), z_dir=(0, -1, 0)) * Cylinder(4.3, 75, mode=Mode.PRIVATE)
    add(chamfer5_piece_7)
    with BuildSketch(Plane(origin=(12.509916826, 2, 25.894006166), x_dir=(0, 0.9996219169112968, 0.027495876610585623), z_dir=(-1, 0, 0))) as chamfer5_piece_8a_section:
        with BuildLine():
            Line((1.028673195, 0), (-0.056547155, 1.027117794))
            Line((-0.056547155, 1.027117794), (-0.076539593, 1.026567876))
            ThreePointArc((-0.076539593, 1.026567876), (-0.034129227, 0.51339783), (-0.019992438, -0.000549918))
            Line((-0.019992438, -0.000549918), (0.000549918, -0.019992438))
            ThreePointArc((0.000549918, -0.019992438), (0.514497665, -0.00585565), (1.029223113, -0.019992438))
            Line((1.029223113, -0.019992438), (1.028673195, 0))
        make_face()
    chamfer5_piece_8a = extrude(amount=83.071682988, mode=Mode.PRIVATE)
    chamfer5_piece_8a = split(chamfer5_piece_8a, bisect_by=Plane(origin=(9.938233838, 2.329793627, 25.564212539), z_dir=(1, 0, 0)), keep=Keep.TOP, mode=Mode.PRIVATE)
    with BuildSketch(Plane(origin=(9.938233838, 2, 28.465689154), x_dir=(-0.9996219169112968, -0.027495876610586296, 0), z_dir=(0, 0, -1))) as chamfer5_piece_8b_section:
        with BuildLine():
            Line((1.028673195, 0), (-0.056547155, 1.027117794))
            Line((-0.056547155, 1.027117794), (-0.076539593, 1.026567876))
            ThreePointArc((-0.076539593, 1.026567876), (-0.034129227, 0.51339783), (-0.019992438, -0.000549918))
            Line((-0.019992438, -0.000549918), (0.000549918, -0.019992438))
            ThreePointArc((0.000549918, -0.019992438), (0.514497665, -0.00585565), (1.029223113, -0.019992438))
            Line((1.029223113, -0.019992438), (1.028673195, 0))
        make_face()
    chamfer5_piece_8b = extrude(amount=60.571682988, mode=Mode.PRIVATE)
    chamfer5_piece_8b = split(chamfer5_piece_8b, bisect_by=Plane(origin=(9.608440211, 2.329793627, 25.894006166), z_dir=(0, 0, 1)), keep=Keep.TOP, mode=Mode.PRIVATE)
    chamfer5_piece_8 = chamfer5_piece_8a & chamfer5_piece_8b
    add(chamfer5_piece_8)
    with BuildSketch(Plane(origin=(-70.561766162, 2, -32.105993834), x_dir=(0, 0.9996219169112968, -0.027495876610589075), z_dir=(1, 0, 0))) as chamfer5_piece_9a_section:
        with BuildLine():
            Line((1.028673195, 0), (-0.056547155, 1.027117794))
            Line((-0.056547155, 1.027117794), (-0.076539593, 1.026567876))
            ThreePointArc((-0.076539593, 1.026567876), (-0.034129227, 0.51339783), (-0.019992438, -0.000549918))
            Line((-0.019992438, -0.000549918), (0.000549918, -0.019992438))
            ThreePointArc((0.000549918, -0.019992438), (0.514497665, -0.00585565), (1.029223113, -0.019992438))
            Line((1.029223113, -0.019992438), (1.028673195, 0))
        make_face()
    chamfer5_piece_9a = extrude(amount=83.071682988, mode=Mode.PRIVATE)
    chamfer5_piece_9a = split(chamfer5_piece_9a, bisect_by=Plane(origin=(9.938233838, 2.329793627, -31.776200208), z_dir=(1, 0, 0)), keep=Keep.TOP, mode=Mode.PRIVATE)
    with BuildSketch(Plane(origin=(9.938233838, 2, 25.894006166), x_dir=(-0.9996219169112968, -0.027495876610586247, 0), z_dir=(0, 0, -1))) as chamfer5_piece_9b_section:
        with BuildLine():
            Line((1.028673195, 0), (-0.056547155, 1.027117794))
            Line((-0.056547155, 1.027117794), (-0.076539593, 1.026567876))
            ThreePointArc((-0.076539593, 1.026567876), (-0.034129227, 0.51339783), (-0.019992438, -0.000549918))
            Line((-0.019992438, -0.000549918), (0.000549918, -0.019992438))
            ThreePointArc((0.000549918, -0.019992438), (0.514497665, -0.00585565), (1.029223113, -0.019992438))
            Line((1.029223113, -0.019992438), (1.028673195, 0))
        make_face()
    chamfer5_piece_9b = extrude(amount=60.571682988, mode=Mode.PRIVATE)
    chamfer5_piece_9b = split(chamfer5_piece_9b, bisect_by=Plane(origin=(9.608440211, 2.329793627, -32.105993834), z_dir=(0, 0, -1)), keep=Keep.TOP, mode=Mode.PRIVATE)
    chamfer5_piece_9 = chamfer5_piece_9a & chamfer5_piece_9b
    add(chamfer5_piece_9)
    with BuildSketch(Plane(origin=(9.36655085, 2, -32.105993834), x_dir=(0, 0.9996219169112968, -0.027495876610589075), z_dir=(1, 0, 0))) as chamfer5_piece_10a_section:
        with BuildLine():
            Line((1.028673195, 0), (-0.056547155, 1.027117794))
            Line((-0.056547155, 1.027117794), (-0.076539593, 1.026567876))
            ThreePointArc((-0.076539593, 1.026567876), (-0.034129227, 0.51339783), (-0.019992438, -0.000549918))
            Line((-0.019992438, -0.000549918), (0.000549918, -0.019992438))
            ThreePointArc((0.000549918, -0.019992438), (0.514497665, -0.00585565), (1.029223113, -0.019992438))
            Line((1.029223113, -0.019992438), (1.028673195, 0))
        make_face()
    chamfer5_piece_10a = extrude(amount=37.817053403, mode=Mode.PRIVATE)
    chamfer5_piece_10a = split(chamfer5_piece_10a, bisect_by=Plane(origin=(11.938233838, 2.329793627, -31.776200208), z_dir=(-1, 0, 0)), keep=Keep.TOP, mode=Mode.PRIVATE)
    with BuildSketch(Plane(origin=(11.938233838, 2, -34.677676822), x_dir=(-0.027495876610585623, 0.9996219169112968, 0), z_dir=(0, 0, 1))) as chamfer5_piece_10b_section:
        with BuildLine():
            Line((1.028673195, 0), (-0.056547155, -1.027117794))
            Line((-0.056547155, -1.027117794), (-0.076539593, -1.026567876))
            ThreePointArc((-0.076539593, -1.026567876), (-0.034129227, -0.51339783), (-0.019992438, 0.000549918))
            Line((-0.019992438, 0.000549918), (0.000549918, 0.019992438))
            ThreePointArc((0.000549918, 0.019992438), (0.514497665, 0.00585565), (1.029223113, 0.019992438))
            Line((1.029223113, 0.019992438), (1.028673195, 0))
        make_face()
    chamfer5_piece_10b = extrude(amount=60.571682988, mode=Mode.PRIVATE)
    chamfer5_piece_10b = split(chamfer5_piece_10b, bisect_by=Plane(origin=(12.268027465, 2.329793627, -32.105993834), z_dir=(0, 0, -1)), keep=Keep.TOP, mode=Mode.PRIVATE)
    chamfer5_piece_10 = chamfer5_piece_10a & chamfer5_piece_10b
    add(chamfer5_piece_10)

    # Chamfer6
    chamfer6_edges = [part.edges().sort_by_distance(p)[0] for p in [
        (50.438233838, 2, -3.105993834),
    ]]
    chamfer(chamfer6_edges, length=CHAMFER6_SIZE)

    # Sketch29 → Boss-Extrude8 (add)
    with BuildSketch(Plane(origin=(0, 10.3, 0), x_dir=(1, 0, 0), z_dir=(0, 1, 0))):
        with Locations((51.588233838, 18.105993834)):
            Rectangle(SKETCH29_W, SKETCH29_H)
    extrude(amount=BOSS_EXTRUDE8_DEPTH)

    # Sketch13 → Cut-Extrude3 (cut, up to next)
    with BuildSketch(Plane(origin=(52.738233838, 0, -61.144227672), x_dir=(0, 0, -1), z_dir=(1, 0, 0)), mode=Mode.PRIVATE) as cut_extrude3_sk1:
        with Locations((-43.738233838, 7.722271929)):
            Circle(SKETCH13_R)
    cut_extrude3_tool1 = extrude(cut_extrude3_sk1.sketch, amount=-CUT_EXTRUDE3_REACH, mode=Mode.PRIVATE) & part.part
    add(cut_extrude3_tool1.solids().sort_by_distance((52.738234, 7.722272, -17.405994))[0], mode=Mode.SUBTRACT)

    # Chamfer7
    chamfer7_edges = [part.edges().sort_by_distance(p)[0] for p in [
        (51.478792997, 0, 26.934565325),
    ]]
    chamfer(chamfer7_edges, length=CHAMFER7_SIZE - 0.0001)  # a hair under: the kernel refuses the full size


solid = part.part
